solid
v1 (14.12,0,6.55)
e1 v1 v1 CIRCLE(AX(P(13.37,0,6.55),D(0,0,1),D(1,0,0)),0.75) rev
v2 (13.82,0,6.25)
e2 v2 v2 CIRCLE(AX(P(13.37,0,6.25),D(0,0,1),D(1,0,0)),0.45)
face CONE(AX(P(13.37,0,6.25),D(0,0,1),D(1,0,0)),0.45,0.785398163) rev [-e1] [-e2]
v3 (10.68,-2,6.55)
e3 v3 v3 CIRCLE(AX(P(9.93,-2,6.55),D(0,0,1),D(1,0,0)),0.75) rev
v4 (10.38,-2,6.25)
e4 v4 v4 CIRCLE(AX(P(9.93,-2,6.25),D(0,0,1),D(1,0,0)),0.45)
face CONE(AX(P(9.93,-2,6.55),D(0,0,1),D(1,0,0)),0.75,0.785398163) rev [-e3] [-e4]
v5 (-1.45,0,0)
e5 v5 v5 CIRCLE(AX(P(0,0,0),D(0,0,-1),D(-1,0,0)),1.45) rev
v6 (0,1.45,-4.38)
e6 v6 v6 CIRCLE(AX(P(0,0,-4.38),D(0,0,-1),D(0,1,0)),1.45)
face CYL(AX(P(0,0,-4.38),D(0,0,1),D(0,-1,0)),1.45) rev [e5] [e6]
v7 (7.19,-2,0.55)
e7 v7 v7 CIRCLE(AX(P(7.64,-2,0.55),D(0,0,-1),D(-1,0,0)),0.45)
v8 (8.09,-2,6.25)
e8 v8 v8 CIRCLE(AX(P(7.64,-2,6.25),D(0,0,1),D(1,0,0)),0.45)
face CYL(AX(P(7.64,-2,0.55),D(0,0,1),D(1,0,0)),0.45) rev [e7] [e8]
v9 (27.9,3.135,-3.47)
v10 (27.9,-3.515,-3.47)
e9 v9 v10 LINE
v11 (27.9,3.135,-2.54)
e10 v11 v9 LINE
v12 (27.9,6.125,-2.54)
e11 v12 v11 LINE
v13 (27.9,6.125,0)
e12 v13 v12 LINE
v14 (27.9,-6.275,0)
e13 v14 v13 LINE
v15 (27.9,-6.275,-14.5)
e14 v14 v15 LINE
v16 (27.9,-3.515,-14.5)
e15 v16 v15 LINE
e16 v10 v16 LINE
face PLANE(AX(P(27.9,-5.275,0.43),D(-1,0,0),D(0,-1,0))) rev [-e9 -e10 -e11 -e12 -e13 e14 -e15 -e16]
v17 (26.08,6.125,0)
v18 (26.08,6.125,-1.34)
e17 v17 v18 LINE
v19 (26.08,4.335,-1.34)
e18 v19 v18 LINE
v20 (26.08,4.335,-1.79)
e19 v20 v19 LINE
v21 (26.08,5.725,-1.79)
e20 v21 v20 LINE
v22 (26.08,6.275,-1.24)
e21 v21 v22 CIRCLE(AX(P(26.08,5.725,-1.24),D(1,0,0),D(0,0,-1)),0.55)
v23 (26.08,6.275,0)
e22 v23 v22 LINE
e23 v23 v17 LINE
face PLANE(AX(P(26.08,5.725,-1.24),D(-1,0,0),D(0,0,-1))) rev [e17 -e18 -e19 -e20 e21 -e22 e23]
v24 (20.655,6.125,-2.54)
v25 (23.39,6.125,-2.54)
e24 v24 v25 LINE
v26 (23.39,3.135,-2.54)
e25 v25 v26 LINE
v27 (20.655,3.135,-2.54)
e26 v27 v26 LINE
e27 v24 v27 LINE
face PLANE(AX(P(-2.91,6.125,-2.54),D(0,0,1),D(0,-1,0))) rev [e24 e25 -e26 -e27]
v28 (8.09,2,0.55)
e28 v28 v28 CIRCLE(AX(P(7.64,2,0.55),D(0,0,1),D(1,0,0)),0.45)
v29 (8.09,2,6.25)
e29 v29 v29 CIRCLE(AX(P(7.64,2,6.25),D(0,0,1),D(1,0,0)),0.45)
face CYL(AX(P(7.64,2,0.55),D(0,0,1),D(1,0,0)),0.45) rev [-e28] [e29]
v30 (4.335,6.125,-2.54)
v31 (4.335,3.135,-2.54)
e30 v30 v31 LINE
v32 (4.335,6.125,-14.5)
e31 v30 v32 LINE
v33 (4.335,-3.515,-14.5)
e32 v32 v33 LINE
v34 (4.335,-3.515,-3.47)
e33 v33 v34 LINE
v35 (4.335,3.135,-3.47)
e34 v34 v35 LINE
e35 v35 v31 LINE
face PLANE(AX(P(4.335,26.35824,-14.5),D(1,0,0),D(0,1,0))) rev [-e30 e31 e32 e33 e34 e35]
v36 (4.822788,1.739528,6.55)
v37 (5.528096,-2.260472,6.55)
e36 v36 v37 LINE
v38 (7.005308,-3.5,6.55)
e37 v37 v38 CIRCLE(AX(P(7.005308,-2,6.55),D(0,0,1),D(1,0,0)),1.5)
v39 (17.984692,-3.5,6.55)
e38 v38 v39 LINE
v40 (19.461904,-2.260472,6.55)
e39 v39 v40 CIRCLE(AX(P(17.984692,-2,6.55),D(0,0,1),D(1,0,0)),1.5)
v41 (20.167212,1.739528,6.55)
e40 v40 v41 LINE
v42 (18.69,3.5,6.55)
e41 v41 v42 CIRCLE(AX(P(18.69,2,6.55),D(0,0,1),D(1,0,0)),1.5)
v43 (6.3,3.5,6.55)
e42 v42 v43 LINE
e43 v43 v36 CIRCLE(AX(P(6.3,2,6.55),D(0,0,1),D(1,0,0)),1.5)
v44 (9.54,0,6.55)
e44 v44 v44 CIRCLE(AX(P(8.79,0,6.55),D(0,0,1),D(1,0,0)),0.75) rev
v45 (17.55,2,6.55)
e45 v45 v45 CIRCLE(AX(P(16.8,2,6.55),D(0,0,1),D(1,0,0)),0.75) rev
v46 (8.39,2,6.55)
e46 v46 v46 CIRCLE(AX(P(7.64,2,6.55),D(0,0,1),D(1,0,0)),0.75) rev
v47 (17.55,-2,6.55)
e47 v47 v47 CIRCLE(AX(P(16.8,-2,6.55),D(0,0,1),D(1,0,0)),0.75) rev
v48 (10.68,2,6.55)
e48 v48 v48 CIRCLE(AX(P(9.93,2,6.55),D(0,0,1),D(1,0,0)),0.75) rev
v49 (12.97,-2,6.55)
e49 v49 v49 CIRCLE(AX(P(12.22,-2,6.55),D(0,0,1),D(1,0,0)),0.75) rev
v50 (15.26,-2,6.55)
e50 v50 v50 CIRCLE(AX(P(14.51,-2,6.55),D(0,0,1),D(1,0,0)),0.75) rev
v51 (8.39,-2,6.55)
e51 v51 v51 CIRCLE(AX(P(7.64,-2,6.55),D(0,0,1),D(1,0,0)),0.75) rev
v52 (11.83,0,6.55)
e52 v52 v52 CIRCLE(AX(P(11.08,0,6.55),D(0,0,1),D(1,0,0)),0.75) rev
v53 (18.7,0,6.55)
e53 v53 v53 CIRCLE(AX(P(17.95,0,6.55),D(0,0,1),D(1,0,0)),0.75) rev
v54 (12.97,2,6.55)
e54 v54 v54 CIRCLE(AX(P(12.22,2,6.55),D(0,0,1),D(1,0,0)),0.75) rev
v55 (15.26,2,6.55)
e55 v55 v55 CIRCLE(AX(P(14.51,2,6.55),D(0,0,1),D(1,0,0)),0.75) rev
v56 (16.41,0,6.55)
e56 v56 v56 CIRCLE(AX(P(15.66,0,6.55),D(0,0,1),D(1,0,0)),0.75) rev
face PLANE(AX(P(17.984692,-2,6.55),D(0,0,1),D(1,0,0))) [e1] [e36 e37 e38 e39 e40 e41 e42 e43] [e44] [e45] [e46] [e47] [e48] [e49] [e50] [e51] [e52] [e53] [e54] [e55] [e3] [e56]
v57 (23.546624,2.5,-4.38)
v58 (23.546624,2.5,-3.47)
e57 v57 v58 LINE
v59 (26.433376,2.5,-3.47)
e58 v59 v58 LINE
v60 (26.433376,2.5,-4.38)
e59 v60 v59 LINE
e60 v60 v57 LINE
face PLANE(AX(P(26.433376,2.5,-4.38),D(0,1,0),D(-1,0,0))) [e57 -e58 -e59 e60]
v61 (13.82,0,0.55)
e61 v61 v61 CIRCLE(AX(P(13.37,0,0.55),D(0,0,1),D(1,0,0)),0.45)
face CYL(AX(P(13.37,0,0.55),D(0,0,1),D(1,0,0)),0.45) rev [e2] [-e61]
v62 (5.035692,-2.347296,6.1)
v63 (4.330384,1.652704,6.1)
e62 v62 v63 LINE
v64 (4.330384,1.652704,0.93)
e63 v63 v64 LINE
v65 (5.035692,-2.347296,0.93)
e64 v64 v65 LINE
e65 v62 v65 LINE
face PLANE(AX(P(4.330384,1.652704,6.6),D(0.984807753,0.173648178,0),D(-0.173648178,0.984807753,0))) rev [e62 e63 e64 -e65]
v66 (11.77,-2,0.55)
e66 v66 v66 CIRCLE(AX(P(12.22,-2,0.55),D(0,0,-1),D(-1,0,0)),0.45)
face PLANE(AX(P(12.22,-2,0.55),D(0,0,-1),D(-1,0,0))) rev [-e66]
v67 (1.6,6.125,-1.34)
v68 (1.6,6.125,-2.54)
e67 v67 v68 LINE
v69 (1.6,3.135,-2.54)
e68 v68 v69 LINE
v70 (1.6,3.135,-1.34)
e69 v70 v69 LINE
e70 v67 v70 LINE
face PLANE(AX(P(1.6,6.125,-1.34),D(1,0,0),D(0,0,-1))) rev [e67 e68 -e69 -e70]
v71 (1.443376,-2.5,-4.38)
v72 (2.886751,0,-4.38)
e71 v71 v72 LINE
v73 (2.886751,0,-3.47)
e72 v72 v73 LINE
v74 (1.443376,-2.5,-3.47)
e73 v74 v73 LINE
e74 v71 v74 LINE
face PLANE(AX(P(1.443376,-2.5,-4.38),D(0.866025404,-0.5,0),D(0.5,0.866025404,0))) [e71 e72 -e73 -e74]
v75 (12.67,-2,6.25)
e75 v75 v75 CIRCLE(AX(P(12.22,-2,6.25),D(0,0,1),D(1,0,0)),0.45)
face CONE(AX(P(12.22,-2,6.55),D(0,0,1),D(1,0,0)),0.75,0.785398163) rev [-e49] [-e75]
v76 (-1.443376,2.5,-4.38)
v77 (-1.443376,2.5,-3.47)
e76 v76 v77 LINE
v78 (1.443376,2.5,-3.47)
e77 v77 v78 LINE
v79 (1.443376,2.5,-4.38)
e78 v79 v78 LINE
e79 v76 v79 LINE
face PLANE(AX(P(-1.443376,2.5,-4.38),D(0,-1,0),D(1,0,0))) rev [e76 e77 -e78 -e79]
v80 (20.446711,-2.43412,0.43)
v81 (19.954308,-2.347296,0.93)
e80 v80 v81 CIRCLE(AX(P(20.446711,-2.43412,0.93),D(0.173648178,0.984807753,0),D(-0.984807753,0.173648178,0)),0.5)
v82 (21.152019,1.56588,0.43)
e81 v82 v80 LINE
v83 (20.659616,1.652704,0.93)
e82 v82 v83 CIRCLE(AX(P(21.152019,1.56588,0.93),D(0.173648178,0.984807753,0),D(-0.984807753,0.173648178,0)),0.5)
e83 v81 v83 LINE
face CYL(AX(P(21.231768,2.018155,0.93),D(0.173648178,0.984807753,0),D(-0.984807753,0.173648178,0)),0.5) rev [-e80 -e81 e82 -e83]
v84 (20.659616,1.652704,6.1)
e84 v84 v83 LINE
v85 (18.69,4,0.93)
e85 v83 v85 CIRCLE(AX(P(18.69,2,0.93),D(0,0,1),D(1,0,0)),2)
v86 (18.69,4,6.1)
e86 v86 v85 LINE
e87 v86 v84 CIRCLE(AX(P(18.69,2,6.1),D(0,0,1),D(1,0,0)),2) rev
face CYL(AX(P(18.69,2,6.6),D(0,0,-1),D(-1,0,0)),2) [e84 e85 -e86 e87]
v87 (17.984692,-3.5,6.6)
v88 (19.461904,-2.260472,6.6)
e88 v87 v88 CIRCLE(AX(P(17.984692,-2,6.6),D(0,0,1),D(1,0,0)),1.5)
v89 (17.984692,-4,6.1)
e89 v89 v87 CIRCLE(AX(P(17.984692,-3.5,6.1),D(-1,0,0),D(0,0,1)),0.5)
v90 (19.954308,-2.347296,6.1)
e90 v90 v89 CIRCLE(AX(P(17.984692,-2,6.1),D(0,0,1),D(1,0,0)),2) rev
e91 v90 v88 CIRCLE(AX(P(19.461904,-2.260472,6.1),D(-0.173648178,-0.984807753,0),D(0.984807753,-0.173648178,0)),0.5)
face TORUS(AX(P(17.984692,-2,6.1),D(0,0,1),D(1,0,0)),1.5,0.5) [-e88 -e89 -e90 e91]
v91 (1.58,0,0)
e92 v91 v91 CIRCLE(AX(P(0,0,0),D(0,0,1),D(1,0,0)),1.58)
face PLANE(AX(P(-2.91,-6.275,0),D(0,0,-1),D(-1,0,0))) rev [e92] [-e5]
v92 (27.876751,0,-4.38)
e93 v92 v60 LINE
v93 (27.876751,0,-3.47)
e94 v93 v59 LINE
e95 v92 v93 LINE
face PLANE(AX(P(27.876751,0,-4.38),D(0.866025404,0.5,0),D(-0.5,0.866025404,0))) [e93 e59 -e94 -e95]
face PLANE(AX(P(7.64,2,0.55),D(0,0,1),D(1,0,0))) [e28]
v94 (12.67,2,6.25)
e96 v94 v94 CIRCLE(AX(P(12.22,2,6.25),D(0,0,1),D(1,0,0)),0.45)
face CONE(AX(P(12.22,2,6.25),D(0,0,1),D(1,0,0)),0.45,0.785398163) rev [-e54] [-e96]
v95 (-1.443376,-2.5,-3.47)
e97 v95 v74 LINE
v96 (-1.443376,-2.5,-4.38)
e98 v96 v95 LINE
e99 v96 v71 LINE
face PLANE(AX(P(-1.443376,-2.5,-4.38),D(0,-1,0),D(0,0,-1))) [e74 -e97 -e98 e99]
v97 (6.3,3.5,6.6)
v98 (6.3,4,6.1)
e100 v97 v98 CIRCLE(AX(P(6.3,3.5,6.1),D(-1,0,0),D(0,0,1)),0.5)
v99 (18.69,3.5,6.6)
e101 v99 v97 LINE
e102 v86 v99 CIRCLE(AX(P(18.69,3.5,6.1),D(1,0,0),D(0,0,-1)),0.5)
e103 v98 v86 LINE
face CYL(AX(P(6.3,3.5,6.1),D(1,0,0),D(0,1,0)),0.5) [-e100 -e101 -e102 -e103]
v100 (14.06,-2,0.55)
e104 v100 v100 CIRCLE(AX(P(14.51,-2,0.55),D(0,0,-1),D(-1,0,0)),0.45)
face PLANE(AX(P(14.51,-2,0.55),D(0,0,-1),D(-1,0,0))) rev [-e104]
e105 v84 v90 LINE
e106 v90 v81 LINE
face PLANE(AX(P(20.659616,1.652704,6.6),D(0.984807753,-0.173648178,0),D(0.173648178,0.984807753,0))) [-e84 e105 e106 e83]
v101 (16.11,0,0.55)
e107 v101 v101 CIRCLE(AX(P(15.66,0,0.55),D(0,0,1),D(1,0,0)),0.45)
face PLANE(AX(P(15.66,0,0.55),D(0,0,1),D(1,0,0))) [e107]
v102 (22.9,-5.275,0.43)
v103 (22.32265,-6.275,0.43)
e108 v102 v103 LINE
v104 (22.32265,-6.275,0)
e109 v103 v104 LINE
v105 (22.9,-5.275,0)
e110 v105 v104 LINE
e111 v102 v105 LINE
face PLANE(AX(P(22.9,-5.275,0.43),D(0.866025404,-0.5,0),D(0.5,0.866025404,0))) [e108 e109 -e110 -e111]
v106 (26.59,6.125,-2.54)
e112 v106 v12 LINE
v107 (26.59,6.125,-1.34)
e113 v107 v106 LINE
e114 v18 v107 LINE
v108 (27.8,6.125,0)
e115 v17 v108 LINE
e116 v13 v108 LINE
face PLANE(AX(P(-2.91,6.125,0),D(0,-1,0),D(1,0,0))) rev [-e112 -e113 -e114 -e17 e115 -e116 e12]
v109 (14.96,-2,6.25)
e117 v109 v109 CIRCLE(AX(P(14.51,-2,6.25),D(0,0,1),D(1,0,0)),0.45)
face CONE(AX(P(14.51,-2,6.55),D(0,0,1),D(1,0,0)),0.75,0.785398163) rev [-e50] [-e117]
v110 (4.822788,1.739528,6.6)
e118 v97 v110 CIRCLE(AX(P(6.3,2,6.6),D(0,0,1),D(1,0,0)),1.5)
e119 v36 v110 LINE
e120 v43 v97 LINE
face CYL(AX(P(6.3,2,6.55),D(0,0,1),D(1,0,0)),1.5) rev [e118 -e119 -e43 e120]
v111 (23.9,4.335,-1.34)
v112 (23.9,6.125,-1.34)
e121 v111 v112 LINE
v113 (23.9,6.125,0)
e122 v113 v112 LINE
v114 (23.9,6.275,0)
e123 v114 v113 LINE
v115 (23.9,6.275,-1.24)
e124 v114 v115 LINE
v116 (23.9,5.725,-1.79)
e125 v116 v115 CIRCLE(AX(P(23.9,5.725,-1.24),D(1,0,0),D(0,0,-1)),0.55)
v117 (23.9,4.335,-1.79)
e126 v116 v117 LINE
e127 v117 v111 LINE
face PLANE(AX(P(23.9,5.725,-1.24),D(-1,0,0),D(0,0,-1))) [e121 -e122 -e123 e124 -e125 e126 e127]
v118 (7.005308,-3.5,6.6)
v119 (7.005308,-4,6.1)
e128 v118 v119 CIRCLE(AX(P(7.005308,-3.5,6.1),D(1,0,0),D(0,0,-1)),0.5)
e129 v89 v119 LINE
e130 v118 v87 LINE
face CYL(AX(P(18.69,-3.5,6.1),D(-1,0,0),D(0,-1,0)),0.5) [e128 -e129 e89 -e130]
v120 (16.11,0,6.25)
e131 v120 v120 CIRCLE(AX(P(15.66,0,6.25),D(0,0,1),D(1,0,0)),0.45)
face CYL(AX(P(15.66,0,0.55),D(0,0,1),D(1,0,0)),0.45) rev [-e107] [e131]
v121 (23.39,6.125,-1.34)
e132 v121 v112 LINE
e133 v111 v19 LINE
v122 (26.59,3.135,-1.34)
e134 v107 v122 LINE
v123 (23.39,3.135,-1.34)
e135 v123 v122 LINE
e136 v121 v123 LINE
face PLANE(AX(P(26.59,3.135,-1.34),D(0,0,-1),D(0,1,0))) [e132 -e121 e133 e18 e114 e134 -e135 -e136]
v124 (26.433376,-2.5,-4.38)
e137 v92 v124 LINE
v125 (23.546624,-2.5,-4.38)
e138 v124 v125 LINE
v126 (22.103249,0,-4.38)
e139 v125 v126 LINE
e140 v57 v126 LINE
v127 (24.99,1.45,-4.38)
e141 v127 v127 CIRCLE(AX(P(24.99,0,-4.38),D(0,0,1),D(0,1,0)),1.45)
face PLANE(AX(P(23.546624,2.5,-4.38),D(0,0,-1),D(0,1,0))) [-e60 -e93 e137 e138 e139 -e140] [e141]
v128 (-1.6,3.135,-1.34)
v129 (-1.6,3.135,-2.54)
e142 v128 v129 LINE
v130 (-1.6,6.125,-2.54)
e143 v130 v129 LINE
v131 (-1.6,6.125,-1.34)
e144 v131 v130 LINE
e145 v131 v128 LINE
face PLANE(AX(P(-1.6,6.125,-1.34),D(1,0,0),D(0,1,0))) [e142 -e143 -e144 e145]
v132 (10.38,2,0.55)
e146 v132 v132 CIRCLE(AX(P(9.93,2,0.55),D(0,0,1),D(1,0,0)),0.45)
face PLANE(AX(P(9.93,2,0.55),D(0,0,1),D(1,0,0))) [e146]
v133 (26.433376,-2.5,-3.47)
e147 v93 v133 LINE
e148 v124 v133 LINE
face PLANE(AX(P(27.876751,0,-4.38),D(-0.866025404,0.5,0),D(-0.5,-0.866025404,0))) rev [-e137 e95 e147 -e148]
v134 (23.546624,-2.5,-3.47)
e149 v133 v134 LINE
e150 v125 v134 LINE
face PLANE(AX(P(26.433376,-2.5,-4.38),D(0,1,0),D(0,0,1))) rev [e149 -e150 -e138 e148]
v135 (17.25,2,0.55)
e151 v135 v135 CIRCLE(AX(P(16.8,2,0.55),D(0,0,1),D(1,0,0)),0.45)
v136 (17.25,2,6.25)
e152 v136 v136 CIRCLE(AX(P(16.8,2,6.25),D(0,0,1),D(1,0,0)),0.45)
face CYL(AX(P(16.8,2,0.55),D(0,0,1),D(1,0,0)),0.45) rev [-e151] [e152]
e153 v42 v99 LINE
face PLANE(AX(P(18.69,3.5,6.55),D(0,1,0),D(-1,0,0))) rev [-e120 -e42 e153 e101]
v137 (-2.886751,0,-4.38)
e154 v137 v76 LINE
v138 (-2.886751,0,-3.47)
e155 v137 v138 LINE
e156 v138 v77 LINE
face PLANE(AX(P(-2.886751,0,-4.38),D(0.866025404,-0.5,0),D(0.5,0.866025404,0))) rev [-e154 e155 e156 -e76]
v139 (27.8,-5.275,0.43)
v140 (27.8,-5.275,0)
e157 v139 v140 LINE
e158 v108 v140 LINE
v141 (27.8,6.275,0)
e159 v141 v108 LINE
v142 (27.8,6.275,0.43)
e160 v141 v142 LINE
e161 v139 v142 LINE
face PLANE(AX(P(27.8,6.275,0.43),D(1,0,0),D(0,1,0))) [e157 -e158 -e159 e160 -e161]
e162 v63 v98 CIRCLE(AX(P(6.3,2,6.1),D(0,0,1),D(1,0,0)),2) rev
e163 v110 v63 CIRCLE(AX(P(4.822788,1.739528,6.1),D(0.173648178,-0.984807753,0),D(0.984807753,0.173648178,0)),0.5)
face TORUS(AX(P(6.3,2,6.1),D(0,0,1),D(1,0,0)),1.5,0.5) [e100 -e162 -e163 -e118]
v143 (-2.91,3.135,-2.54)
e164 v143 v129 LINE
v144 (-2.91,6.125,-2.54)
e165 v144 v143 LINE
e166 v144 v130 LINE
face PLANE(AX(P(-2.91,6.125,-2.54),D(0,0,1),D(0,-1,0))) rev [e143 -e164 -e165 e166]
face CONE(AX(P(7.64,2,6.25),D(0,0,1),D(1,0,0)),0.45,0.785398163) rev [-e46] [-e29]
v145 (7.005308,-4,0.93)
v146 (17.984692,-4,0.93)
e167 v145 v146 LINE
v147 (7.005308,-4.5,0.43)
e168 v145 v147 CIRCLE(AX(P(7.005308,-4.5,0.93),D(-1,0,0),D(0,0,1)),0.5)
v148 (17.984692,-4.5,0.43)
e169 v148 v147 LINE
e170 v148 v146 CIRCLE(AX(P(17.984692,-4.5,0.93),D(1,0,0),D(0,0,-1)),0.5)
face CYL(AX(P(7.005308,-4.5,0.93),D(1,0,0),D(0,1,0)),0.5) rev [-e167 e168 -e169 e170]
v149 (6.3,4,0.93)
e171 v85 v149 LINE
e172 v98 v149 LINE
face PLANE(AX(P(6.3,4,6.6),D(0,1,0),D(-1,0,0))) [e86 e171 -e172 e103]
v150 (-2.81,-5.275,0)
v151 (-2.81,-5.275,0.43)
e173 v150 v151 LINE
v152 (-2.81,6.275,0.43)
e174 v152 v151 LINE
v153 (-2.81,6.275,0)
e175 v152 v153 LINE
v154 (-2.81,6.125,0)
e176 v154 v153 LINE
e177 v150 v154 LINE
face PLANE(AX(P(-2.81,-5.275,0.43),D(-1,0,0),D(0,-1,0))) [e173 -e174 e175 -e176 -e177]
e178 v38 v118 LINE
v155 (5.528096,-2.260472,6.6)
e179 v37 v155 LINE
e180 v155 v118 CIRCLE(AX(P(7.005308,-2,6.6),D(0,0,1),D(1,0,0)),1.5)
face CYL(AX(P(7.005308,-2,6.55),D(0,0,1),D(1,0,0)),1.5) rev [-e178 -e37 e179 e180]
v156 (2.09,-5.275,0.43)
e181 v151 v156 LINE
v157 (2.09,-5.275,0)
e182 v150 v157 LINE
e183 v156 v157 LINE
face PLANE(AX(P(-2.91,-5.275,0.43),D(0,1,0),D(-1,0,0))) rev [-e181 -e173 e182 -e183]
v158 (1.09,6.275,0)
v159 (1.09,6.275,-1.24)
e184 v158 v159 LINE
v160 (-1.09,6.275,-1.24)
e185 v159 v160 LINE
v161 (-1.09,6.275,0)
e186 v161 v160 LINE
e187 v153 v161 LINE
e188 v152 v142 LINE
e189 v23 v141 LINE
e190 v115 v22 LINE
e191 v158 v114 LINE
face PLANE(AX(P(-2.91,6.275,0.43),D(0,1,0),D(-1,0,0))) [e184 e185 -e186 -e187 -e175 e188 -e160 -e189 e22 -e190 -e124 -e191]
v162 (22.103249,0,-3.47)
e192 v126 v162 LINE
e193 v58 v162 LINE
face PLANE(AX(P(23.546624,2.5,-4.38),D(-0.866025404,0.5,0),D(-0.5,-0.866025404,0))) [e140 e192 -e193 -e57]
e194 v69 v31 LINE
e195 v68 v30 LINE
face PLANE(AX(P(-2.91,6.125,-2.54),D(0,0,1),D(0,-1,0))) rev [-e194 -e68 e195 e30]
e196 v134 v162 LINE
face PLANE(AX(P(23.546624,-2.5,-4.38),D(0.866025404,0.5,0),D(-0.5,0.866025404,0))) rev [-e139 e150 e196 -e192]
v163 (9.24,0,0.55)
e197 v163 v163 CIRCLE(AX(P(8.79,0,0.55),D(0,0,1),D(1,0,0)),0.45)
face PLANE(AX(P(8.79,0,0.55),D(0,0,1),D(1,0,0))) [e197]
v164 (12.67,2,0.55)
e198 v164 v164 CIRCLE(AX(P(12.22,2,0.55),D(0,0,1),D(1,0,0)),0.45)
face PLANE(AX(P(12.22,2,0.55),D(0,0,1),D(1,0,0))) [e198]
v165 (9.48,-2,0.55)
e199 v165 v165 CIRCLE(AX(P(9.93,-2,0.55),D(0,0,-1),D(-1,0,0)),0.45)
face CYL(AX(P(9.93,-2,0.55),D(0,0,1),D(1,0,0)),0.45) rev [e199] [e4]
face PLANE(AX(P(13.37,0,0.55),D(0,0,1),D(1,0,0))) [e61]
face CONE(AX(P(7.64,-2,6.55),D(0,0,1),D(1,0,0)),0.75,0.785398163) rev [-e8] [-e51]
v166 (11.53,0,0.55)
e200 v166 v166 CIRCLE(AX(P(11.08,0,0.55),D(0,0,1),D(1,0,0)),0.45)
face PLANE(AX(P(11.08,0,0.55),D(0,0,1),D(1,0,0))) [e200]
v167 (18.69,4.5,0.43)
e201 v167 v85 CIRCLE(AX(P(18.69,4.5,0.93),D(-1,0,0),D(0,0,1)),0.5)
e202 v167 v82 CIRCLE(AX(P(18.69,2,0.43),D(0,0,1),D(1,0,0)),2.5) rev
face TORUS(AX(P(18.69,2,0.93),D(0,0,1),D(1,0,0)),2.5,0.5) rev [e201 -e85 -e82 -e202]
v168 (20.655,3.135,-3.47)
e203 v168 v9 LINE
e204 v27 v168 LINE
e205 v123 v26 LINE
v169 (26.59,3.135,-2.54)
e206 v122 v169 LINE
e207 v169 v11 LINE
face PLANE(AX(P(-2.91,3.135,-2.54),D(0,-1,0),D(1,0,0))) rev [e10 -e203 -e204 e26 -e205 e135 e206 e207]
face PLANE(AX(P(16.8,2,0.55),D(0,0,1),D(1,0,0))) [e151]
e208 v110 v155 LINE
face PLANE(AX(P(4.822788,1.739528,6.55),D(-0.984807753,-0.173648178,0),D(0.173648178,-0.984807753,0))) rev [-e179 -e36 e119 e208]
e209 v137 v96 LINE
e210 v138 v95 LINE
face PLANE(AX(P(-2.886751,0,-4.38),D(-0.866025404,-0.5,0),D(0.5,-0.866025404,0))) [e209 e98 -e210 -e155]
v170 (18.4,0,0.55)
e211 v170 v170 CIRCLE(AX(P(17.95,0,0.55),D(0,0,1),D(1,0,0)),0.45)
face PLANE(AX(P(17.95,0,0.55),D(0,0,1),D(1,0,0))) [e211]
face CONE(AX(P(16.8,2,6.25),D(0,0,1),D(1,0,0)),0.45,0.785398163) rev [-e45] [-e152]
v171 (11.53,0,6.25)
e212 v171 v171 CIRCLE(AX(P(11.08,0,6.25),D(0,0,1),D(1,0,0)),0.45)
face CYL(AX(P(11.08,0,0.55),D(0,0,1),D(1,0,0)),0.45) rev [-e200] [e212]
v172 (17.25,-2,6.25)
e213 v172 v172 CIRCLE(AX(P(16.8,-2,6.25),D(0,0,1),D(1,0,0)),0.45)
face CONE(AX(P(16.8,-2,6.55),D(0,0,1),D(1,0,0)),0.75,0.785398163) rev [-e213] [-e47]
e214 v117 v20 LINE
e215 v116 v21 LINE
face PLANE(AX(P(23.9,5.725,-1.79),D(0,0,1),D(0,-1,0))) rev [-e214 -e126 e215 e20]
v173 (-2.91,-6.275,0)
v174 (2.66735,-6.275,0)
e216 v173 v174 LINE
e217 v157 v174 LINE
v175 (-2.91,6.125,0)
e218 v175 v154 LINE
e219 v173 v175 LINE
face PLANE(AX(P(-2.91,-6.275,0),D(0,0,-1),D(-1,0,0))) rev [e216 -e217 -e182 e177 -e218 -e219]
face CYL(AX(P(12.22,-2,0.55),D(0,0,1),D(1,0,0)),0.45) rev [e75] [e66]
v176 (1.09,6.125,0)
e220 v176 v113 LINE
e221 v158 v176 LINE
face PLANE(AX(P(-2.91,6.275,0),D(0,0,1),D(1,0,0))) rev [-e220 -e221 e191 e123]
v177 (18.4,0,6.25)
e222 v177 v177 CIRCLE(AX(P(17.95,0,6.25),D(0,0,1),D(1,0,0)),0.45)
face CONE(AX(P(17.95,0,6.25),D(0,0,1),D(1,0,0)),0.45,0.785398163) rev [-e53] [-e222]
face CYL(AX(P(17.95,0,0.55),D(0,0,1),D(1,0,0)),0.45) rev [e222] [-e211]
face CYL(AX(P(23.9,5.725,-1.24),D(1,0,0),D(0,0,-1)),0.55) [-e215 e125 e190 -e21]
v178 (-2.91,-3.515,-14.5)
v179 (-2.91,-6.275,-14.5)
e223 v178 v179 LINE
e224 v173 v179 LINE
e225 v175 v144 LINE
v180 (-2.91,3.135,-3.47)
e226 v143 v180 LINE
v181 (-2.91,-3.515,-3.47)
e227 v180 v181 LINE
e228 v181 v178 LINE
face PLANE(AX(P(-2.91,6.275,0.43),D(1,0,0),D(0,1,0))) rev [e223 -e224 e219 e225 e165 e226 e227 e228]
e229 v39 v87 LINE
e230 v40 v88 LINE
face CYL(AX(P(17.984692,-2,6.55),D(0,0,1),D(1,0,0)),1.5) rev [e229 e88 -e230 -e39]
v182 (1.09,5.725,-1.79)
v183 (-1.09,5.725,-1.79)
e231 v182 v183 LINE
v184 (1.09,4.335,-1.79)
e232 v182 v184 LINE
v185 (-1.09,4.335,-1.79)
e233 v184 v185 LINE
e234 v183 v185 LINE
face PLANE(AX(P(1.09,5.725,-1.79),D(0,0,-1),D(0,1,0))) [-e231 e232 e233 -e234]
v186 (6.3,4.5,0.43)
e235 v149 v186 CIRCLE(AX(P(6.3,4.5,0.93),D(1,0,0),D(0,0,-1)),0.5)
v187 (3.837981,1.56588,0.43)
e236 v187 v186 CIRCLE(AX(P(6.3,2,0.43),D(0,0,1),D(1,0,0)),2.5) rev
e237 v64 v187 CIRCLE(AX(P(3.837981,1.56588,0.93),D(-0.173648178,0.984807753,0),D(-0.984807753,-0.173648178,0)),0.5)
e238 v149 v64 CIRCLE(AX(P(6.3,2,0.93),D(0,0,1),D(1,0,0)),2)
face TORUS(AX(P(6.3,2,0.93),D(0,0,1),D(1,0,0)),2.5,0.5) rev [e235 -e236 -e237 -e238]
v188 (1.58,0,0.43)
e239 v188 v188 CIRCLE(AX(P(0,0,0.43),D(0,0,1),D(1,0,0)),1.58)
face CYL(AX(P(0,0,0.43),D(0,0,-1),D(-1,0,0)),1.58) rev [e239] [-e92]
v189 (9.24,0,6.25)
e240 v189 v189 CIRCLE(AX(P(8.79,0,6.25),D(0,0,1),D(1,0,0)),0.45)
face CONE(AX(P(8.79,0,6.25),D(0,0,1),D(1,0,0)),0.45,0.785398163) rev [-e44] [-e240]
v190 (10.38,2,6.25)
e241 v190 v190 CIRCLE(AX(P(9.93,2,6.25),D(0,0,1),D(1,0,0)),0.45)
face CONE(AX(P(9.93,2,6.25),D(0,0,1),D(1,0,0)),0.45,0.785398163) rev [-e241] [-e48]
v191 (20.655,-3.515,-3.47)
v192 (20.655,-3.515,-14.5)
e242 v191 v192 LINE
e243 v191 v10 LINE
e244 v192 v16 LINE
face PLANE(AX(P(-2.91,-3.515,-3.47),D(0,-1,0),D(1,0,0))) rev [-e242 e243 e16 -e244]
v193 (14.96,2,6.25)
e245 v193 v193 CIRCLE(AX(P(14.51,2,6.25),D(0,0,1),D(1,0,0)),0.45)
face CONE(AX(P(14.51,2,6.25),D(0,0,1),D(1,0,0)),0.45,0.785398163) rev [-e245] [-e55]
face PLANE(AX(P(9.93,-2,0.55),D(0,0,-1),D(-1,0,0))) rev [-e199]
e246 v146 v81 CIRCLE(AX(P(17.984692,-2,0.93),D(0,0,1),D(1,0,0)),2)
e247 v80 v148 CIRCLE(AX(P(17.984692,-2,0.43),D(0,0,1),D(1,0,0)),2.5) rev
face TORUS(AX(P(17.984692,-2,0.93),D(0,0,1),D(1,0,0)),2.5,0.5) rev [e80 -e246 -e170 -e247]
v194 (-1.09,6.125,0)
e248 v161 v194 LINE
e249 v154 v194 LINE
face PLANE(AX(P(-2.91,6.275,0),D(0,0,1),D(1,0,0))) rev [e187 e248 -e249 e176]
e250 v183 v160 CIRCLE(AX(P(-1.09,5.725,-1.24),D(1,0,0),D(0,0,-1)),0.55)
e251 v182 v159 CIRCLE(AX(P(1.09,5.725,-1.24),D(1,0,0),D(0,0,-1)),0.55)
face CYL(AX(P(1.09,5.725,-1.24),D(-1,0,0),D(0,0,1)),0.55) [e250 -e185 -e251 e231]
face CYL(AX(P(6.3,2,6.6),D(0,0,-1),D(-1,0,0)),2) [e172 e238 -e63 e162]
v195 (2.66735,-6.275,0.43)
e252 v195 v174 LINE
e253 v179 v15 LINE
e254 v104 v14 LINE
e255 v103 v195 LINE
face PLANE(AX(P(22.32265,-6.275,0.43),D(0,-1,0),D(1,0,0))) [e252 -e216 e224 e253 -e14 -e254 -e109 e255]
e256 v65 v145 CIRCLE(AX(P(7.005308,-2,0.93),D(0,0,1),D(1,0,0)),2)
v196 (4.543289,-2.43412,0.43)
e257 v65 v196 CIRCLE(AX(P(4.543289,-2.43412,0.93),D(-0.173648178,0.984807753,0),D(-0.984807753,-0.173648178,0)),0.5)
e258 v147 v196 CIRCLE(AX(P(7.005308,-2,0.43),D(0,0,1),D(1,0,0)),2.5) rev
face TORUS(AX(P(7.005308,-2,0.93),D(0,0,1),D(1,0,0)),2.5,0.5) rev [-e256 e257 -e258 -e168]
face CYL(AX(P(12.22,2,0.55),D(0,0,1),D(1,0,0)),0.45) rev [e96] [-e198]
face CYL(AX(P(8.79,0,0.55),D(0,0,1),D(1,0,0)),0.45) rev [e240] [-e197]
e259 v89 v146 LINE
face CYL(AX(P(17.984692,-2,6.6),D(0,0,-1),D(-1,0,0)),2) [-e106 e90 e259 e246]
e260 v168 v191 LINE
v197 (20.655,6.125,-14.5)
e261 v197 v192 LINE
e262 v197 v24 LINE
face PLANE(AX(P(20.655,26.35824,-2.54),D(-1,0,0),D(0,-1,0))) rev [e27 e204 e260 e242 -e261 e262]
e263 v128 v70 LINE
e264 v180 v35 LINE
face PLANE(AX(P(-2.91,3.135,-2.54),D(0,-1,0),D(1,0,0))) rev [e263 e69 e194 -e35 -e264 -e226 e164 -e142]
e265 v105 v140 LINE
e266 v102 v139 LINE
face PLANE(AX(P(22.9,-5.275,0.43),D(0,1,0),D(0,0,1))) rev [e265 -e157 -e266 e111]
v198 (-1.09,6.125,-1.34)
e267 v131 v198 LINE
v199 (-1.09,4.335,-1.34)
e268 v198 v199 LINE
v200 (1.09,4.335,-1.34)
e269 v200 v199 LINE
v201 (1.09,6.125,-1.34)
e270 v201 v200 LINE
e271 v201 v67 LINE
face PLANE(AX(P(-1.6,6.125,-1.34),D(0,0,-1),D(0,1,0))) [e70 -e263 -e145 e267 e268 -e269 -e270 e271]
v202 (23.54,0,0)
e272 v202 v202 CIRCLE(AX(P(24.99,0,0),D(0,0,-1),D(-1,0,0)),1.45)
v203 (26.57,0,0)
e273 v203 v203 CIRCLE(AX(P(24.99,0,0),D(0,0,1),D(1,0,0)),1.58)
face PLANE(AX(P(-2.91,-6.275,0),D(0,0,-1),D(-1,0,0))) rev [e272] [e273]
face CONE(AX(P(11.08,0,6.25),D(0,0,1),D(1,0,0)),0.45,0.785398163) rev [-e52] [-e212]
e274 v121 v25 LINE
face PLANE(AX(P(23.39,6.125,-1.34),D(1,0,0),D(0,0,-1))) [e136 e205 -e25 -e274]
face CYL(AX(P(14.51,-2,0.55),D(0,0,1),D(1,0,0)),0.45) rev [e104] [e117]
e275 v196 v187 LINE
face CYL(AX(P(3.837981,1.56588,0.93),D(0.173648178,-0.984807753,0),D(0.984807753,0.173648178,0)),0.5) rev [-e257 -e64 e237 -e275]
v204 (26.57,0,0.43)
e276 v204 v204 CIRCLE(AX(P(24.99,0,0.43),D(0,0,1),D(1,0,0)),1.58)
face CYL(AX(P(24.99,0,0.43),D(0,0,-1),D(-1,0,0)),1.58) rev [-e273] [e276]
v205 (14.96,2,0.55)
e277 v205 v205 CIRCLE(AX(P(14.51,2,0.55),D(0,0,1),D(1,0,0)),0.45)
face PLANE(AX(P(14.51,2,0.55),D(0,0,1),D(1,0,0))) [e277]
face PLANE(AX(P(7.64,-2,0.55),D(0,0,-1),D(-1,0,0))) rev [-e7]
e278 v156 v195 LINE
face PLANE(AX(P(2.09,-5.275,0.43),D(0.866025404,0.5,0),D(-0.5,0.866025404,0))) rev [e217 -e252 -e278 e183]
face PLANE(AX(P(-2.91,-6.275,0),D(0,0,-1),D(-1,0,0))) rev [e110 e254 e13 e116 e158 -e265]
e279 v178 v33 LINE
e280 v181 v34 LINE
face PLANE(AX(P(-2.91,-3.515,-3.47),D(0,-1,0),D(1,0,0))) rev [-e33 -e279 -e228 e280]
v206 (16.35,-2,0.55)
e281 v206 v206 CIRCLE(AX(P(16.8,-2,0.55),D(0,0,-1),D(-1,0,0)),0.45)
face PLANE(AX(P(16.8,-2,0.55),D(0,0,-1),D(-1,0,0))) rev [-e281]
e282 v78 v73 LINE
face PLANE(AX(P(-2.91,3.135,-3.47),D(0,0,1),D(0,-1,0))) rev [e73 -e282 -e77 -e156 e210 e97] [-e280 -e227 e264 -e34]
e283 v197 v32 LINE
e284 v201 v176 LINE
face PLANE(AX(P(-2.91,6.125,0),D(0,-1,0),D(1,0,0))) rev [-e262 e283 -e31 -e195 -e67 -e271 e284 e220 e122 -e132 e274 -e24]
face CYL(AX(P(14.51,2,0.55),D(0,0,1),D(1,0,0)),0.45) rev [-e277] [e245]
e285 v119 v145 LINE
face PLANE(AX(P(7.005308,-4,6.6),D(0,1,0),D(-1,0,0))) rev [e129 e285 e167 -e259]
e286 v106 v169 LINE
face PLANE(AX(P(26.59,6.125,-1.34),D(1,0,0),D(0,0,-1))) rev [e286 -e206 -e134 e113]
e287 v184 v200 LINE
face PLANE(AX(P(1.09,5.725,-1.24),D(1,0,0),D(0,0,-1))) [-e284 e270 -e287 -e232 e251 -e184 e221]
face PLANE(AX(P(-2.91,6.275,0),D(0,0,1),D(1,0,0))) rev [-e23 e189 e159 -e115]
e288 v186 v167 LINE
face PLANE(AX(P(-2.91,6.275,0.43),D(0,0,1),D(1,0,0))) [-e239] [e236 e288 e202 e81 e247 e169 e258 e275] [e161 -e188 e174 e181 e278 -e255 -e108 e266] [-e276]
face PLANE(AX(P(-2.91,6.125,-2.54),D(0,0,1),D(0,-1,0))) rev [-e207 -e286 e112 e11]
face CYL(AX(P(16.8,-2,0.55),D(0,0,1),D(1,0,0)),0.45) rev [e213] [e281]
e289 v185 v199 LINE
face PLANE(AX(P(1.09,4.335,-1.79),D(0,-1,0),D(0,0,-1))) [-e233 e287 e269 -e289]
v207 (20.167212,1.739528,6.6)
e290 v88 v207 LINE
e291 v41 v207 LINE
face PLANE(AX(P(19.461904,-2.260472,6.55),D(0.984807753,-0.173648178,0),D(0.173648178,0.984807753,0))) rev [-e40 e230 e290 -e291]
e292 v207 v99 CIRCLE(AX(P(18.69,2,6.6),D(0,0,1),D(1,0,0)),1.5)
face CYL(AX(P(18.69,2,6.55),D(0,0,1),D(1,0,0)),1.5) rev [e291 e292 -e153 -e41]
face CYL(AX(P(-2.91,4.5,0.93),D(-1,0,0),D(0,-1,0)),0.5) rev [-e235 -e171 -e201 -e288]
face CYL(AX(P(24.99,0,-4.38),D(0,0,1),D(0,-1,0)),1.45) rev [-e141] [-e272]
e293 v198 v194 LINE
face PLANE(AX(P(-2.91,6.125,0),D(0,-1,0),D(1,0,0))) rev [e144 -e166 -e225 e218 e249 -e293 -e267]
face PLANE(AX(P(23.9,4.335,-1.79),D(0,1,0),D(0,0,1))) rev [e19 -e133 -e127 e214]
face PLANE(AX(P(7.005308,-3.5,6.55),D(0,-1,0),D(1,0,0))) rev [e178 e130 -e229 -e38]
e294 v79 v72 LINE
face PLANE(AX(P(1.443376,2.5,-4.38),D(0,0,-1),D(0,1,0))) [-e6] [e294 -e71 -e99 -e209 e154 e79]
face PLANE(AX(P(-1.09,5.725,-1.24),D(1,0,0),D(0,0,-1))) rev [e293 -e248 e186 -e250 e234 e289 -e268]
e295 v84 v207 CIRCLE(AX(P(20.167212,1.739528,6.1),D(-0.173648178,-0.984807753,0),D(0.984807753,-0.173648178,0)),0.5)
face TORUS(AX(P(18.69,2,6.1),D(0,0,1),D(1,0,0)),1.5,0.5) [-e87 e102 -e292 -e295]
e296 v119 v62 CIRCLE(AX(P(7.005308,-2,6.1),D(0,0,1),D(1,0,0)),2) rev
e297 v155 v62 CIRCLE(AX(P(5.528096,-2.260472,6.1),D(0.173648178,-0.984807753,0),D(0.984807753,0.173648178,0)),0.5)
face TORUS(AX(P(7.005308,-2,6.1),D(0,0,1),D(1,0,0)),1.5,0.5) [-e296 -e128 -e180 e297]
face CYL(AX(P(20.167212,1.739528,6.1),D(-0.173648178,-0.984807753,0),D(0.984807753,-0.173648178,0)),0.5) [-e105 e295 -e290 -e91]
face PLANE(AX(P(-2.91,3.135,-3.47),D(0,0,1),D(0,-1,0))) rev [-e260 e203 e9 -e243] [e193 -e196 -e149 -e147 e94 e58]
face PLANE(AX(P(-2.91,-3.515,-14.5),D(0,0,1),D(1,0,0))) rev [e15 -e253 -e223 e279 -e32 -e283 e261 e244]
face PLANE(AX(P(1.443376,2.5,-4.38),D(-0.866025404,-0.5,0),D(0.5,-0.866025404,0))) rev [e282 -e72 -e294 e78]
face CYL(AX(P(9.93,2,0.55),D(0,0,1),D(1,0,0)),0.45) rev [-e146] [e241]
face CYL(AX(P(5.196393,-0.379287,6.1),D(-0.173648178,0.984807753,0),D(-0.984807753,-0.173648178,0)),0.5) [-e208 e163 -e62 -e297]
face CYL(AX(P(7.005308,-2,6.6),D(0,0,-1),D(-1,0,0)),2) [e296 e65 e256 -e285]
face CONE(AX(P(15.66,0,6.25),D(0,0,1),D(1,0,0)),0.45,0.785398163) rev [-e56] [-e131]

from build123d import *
from build123d.topology import SkipClean

# Parameters (mm, degrees)
SKETCH1_R                 = 1.58
BASE_EXTRUDE_DEPTH        = 0.43
ENGAGEMENT_D_DEPTH        = 6.17
ENGAGEMENT_RADII_R        = 0.5
TOP_START                 = -2.54
TOP_CUT_OUT_OUTLINE_W     = 30.81
TOP_CUT_OUT_OUTLINE_H     = 2.76
TOP_CUT_OUT_DEPTH         = 14.5
TOP_CUT_OUT_2_OUTLINE_W   = 30.81
TOP_CUT_OUT_2_OUTLINE_H   = 6.65
TOP_CUT_OUT_2_DEPTH       = 3.47
TOP_CUT_OUT_3_OUTLINE_W   = 1.31
TOP_CUT_OUT_3_OUTLINE_H   = 2.99
TOP_CUT_OUT_3_OUTLINE_W_2 = 21.79
TOP_CUT_OUT_3_DEPTH       = 2.54
TOP_CUT_OUT_4_OUTLINE_W   = 3.2
TOP_CUT_OUT_4_OUTLINE_H   = 2.99
TOP_CUT_OUT_4_DEPTH       = 1.34
TAB_TOP_DEPTH             = 1.09
SKETCH15_R                = 1.45
NUT_DEPTH                 = 0.91
NUT_HOLE_REACH            = 32.65
SKETCH16_R                = 1.45
CUT_EXTRUDE9_DEPTH        = 0.05
SKETCH20_W                = 16.32
SKETCH20_H                = 11.96
BOSS_EXTRUDE1_DEPTH       = 9.64
SKETCH25_W                = 0.43
SKETCH25_H                = 11.55
CUT_EXTRUDE13_DEPTH       = 0.1
SKETCH26_W                = 0.43
SKETCH26_H                = 11.55
CUT_EXTRUDE14_DEPTH       = 0.1
SKETCH30_R                = 0.45
CUT_EXTRUDE16_DEPTH       = 6
LPATTERN1_COUNT           = 5
LPATTERN1_PITCH           = 2.29
CHAMFER1_SIZE             = 0.3


# Read off the part's stored shape, not the designer's step: top cut out
with BuildPart() as part:
    # Sketch1 → Base-Extrude (new body)
    with BuildSketch(Plane.XY):
        Polygon((-2.91, 6.275), (27.9, 6.275), (27.9, -5.275), (22.9, -5.275), (22.322649731, -6.275), (2.667350269, -6.275), (2.09, -5.275), (-2.91, -5.275), align=None)
        Circle(SKETCH1_R, mode=Mode.SUBTRACT)
        with Locations((24.99, 0)):
            Circle(SKETCH1_R, mode=Mode.SUBTRACT)
    extrude(amount=BASE_EXTRUDE_DEPTH)

    # Sketch2 → engagement D (add)
    with BuildSketch(Plane.XY.offset(0.43)):
        with BuildLine():
            Line((6.3, 4), (18.69, 4))
            ThreePointArc((18.69, 4), (20.222088886, 3.285575219), (20.659615506, 1.652703645))
            Line((20.659615506, 1.652703645), (19.954307583, -2.347296355))
            ThreePointArc((19.954307583, -2.347296355), (19.270267297, -3.532088886), (17.984692077, -4))
            Line((17.984692077, -4), (7.005307923, -4))
            ThreePointArc((7.005307923, -4), (5.719732703, -3.532088886), (5.035692417, -2.347296355))
            Line((5.035692417, -2.347296355), (4.330384494, 1.652703645))
            ThreePointArc((4.330384494, 1.652703645), (4.767911114, 3.285575219), (6.3, 4))
        make_face()
    extrude(amount=ENGAGEMENT_D_DEPTH)

    # engagement radii
    engagement_radii_edges = [part.edges().sort_by_distance(p)[0] for p in [
        (20.222088886, 3.285575219, 0.43),
        (12.495, 4, 6.6),
        (4.767911114, 3.285575219, 6.6),
        (4.683038455, -0.347296355, 0.43),
        (5.719732703, -3.532088886, 6.6),
        (12.495, -4, 0.43),
        (19.270267297, -3.532088886, 0.43),
        (20.306961545, -0.347296355, 6.6),
        (20.222088886, 3.285575219, 6.6),
        (4.683038455, -0.347296355, 6.6),
        (12.495, -4, 6.6),
        (19.270267297, -3.532088886, 6.6),
        (20.306961545, -0.347296355, 0.43),
        (5.719732703, -3.532088886, 0.43),
        (4.767911114, 3.285575219, 0.43),
        (12.495, 4, 0.43),
    ]]
    fillet(engagement_radii_edges, radius=ENGAGEMENT_RADII_R)

    # top cut out outline → top cut out (add)
    with BuildSketch(Plane(origin=(0, 0, -2.54), x_dir=(-1, 0, 0), z_dir=(0, 0, -1)).offset(TOP_START)):
        with Locations((-12.495, -4.895)):
            Rectangle(TOP_CUT_OUT_OUTLINE_W, TOP_CUT_OUT_OUTLINE_H)
    extrude(amount=TOP_CUT_OUT_DEPTH)

    # top cut out 2 outline → top cut out 2 (add)
    with BuildSketch(Plane(origin=(0, 0, -2.54), x_dir=(-1, 0, 0), z_dir=(0, 0, -1)).offset(TOP_START)):
        with Locations((-12.495, -0.19)):
            Rectangle(TOP_CUT_OUT_2_OUTLINE_W, TOP_CUT_OUT_2_OUTLINE_H)
    extrude(amount=TOP_CUT_OUT_2_DEPTH)

    # top cut out 3 outline → top cut out 3 (add)
    with BuildSketch(Plane(origin=(0, 0, -2.54), x_dir=(-1, 0, 0), z_dir=(0, 0, -1)).offset(TOP_START)):
        with Locations((-27.245, 4.63)):
            Rectangle(TOP_CUT_OUT_3_OUTLINE_W, TOP_CUT_OUT_3_OUTLINE_H)
        with Locations((-12.495, 4.63)):
            Rectangle(TOP_CUT_OUT_3_OUTLINE_W_2, TOP_CUT_OUT_3_OUTLINE_H)
        with Locations((2.255, 4.63)):
            Rectangle(TOP_CUT_OUT_3_OUTLINE_W, TOP_CUT_OUT_3_OUTLINE_H)
    extrude(amount=TOP_CUT_OUT_3_DEPTH)

    # top cut out 4 outline → top cut out 4 (add)
    with BuildSketch(Plane(origin=(0, 0, -2.54), x_dir=(-1, 0, 0), z_dir=(0, 0, -1)).offset(TOP_START)):
        with Locations((-24.99, 4.63)):
            Rectangle(TOP_CUT_OUT_4_OUTLINE_W, TOP_CUT_OUT_4_OUTLINE_H)
        with Locations((0, 4.63)):
            Rectangle(TOP_CUT_OUT_4_OUTLINE_W, TOP_CUT_OUT_4_OUTLINE_H)
    extrude(amount=TOP_CUT_OUT_4_DEPTH)

    # Sketch14 → tab top (add, symmetric)
    with BuildSketch(Plane(origin=(0, 0, 0), x_dir=(0, 0, -1), z_dir=(1, 0, 0))):
        with BuildLine():
            Line((1.34, 5.725), (1.34, 4.335))
            Line((1.34, 4.335), (1.79, 4.335))
            Line((1.79, 4.335), (1.79, 5.725))
            ThreePointArc((1.79, 5.725), (1.62890873, 6.11390873), (1.24, 6.275))
            Line((1.24, 6.275), (0, 6.275))
            Line((0, 6.275), (0, 5.825))
            Line((0, 5.825), (1.24, 5.825))
            ThreePointArc((1.24, 5.825), (1.310710678, 5.795710678), (1.34, 5.725))
        make_face()
    tab_top = extrude(amount=TAB_TOP_DEPTH, both=True)

    # tab 2: tab top across plane
    add(tab_top.mirror(Plane(origin=(12.495, 0, 0), x_dir=(0, 0, 1), z_dir=(1, 0, 0))))

    # Sketch15 → nut (add)
    with BuildSketch(Plane(origin=(0, 0, -3.47), x_dir=(-1, 0, 0), z_dir=(0, 0, -1))):
        Polygon((2.886751346, 0), (1.443375673, 2.5), (-1.443375673, 2.5), (-2.886751346, 0), (-1.443375673, -2.5), (1.443375673, -2.5), align=None)
        with Locations(Location((0, 0, 0), (0, 0, 90))):
            Circle(SKETCH15_R, mode=Mode.SUBTRACT)
    nut = extrude(amount=NUT_DEPTH)

    # Sketch16 → nut hole (cut, up to next)
    with BuildSketch(Plane(origin=(0, 0, -3.47), x_dir=(-1, 0, 0), z_dir=(0, 0, -1)), mode=Mode.PRIVATE) as nut_hole_sk1:
        Circle(SKETCH16_R)
    nut_hole_tool1 = extrude(nut_hole_sk1.sketch, amount=-NUT_HOLE_REACH, mode=Mode.PRIVATE) & part.part
    nut_hole = nut_hole_tool1.solids().sort_by_distance((0, 0, -3.47))[0]
    add(nut_hole, mode=Mode.SUBTRACT)

    # nut 2: nut, nut hole across plane
    with SkipClean():  # the faces are left unmerged after this step: merging them gives an invalid solid
        add(nut.mirror(Plane(origin=(12.495, 0, 0), x_dir=(0, 0, 1), z_dir=(1, 0, 0))))
        add(nut_hole.mirror(Plane(origin=(12.495, 0, 0), x_dir=(0, 0, 1), z_dir=(1, 0, 0))), mode=Mode.SUBTRACT)

    # Sketch18 → Cut-Extrude9 (cut)
    with SkipClean():  # the faces are left unmerged after this step: merging them gives an invalid solid
        with BuildSketch(Plane.XY.offset(6.6)):
            with BuildLine():
                Line((19.461903707, -2.260472267), (20.16721163, 1.739527733))
                ThreePointArc((20.16721163, 1.739527733), (19.839066665, 2.964181415), (18.69, 3.5))
                Line((18.69, 3.5), (6.3, 3.5))
                ThreePointArc((6.3, 3.5), (5.150933335, 2.964181415), (4.82278837, 1.739527733))
                Line((4.82278837, 1.739527733), (5.528096293, -2.260472267))
                ThreePointArc((5.528096293, -2.260472267), (6.041126508, -3.149066665), (7.005307923, -3.5))
                Line((7.005307923, -3.5), (17.984692077, -3.5))
                ThreePointArc((17.984692077, -3.5), (18.948873492, -3.149066665), (19.461903707, -2.260472267))
            make_face()
        extrude(amount=-CUT_EXTRUDE9_DEPTH, mode=Mode.SUBTRACT)

    # Sketch20 → Boss-Extrude1 (add)
    with SkipClean():  # the faces are left unmerged after this step: merging them gives an invalid solid
        with BuildSketch(Plane(origin=(0, -3.515, 0), x_dir=(-1, 0, 0), z_dir=(0, 1, 0))):
            with Locations((-12.495, -8.52)):
                Rectangle(SKETCH20_W, SKETCH20_H)
        extrude(amount=BOSS_EXTRUDE1_DEPTH)

    # Sketch25 → Cut-Extrude13 (cut)
    with SkipClean():  # the faces are left unmerged after this step: merging them gives an invalid solid
        with BuildSketch(Plane(origin=(27.9, 0, 0), x_dir=(0, 0, -1), z_dir=(1, 0, 0))):
            with Locations((-0.215, 0.5)):
                Rectangle(SKETCH25_W, SKETCH25_H)
        extrude(amount=-CUT_EXTRUDE13_DEPTH, mode=Mode.SUBTRACT)

    # Sketch26 → Cut-Extrude14 (cut)
    with SkipClean():  # the faces are left unmerged after this step: merging them gives an invalid solid
        with BuildSketch(Plane.ZY.offset(2.91)):
            with Locations((0.215, 0.5)):
                Rectangle(SKETCH26_W, SKETCH26_H)
        extrude(amount=-CUT_EXTRUDE14_DEPTH, mode=Mode.SUBTRACT)

    # Sketch30 → Cut-Extrude16 (cut)
    with SkipClean():  # the faces are left unmerged after this step: merging them gives an invalid solid
        with BuildSketch(Plane.XY.offset(6.55)):
            with Locations((16.8, 2)):
                Circle(SKETCH30_R)
            with Locations(Location((16.8, -2, 0), (0, 0, 180))):
                Circle(SKETCH30_R)
            with Locations((17.95, 0)):
                Circle(SKETCH30_R)
        cut_extrude16 = extrude(amount=-CUT_EXTRUDE16_DEPTH, mode=Mode.SUBTRACT)

    # LPattern1: Cut-Extrude16 ×5
    with SkipClean():  # the faces are left unmerged after this step: merging them gives an invalid solid
        with Locations(*[(-i * LPATTERN1_PITCH, 0, 0) for i in range(1, LPATTERN1_COUNT)]):
            add(cut_extrude16, mode=Mode.SUBTRACT)

    # Chamfer1
    chamfer1_edges = [part.edges().sort_by_distance(p)[0] for p in [
        (16.35, 2, 6.55),
        (17.25, -2, 6.55),
        (17.5, 0, 6.55),
        (14.06, 2, 6.55),
        (14.96, -2, 6.55),
        (15.21, 0, 6.55),
        (11.77, 2, 6.55),
        (12.67, -2, 6.55),
        (12.92, 0, 6.55),
        (9.48, 2, 6.55),
        (10.38, -2, 6.55),
        (10.63, 0, 6.55),
        (7.19, 2, 6.55),
        (8.09, -2, 6.55),
        (8.34, 0, 6.55),
    ]]
    chamfer(chamfer1_edges, length=CHAMFER1_SIZE)


solid = part.part
